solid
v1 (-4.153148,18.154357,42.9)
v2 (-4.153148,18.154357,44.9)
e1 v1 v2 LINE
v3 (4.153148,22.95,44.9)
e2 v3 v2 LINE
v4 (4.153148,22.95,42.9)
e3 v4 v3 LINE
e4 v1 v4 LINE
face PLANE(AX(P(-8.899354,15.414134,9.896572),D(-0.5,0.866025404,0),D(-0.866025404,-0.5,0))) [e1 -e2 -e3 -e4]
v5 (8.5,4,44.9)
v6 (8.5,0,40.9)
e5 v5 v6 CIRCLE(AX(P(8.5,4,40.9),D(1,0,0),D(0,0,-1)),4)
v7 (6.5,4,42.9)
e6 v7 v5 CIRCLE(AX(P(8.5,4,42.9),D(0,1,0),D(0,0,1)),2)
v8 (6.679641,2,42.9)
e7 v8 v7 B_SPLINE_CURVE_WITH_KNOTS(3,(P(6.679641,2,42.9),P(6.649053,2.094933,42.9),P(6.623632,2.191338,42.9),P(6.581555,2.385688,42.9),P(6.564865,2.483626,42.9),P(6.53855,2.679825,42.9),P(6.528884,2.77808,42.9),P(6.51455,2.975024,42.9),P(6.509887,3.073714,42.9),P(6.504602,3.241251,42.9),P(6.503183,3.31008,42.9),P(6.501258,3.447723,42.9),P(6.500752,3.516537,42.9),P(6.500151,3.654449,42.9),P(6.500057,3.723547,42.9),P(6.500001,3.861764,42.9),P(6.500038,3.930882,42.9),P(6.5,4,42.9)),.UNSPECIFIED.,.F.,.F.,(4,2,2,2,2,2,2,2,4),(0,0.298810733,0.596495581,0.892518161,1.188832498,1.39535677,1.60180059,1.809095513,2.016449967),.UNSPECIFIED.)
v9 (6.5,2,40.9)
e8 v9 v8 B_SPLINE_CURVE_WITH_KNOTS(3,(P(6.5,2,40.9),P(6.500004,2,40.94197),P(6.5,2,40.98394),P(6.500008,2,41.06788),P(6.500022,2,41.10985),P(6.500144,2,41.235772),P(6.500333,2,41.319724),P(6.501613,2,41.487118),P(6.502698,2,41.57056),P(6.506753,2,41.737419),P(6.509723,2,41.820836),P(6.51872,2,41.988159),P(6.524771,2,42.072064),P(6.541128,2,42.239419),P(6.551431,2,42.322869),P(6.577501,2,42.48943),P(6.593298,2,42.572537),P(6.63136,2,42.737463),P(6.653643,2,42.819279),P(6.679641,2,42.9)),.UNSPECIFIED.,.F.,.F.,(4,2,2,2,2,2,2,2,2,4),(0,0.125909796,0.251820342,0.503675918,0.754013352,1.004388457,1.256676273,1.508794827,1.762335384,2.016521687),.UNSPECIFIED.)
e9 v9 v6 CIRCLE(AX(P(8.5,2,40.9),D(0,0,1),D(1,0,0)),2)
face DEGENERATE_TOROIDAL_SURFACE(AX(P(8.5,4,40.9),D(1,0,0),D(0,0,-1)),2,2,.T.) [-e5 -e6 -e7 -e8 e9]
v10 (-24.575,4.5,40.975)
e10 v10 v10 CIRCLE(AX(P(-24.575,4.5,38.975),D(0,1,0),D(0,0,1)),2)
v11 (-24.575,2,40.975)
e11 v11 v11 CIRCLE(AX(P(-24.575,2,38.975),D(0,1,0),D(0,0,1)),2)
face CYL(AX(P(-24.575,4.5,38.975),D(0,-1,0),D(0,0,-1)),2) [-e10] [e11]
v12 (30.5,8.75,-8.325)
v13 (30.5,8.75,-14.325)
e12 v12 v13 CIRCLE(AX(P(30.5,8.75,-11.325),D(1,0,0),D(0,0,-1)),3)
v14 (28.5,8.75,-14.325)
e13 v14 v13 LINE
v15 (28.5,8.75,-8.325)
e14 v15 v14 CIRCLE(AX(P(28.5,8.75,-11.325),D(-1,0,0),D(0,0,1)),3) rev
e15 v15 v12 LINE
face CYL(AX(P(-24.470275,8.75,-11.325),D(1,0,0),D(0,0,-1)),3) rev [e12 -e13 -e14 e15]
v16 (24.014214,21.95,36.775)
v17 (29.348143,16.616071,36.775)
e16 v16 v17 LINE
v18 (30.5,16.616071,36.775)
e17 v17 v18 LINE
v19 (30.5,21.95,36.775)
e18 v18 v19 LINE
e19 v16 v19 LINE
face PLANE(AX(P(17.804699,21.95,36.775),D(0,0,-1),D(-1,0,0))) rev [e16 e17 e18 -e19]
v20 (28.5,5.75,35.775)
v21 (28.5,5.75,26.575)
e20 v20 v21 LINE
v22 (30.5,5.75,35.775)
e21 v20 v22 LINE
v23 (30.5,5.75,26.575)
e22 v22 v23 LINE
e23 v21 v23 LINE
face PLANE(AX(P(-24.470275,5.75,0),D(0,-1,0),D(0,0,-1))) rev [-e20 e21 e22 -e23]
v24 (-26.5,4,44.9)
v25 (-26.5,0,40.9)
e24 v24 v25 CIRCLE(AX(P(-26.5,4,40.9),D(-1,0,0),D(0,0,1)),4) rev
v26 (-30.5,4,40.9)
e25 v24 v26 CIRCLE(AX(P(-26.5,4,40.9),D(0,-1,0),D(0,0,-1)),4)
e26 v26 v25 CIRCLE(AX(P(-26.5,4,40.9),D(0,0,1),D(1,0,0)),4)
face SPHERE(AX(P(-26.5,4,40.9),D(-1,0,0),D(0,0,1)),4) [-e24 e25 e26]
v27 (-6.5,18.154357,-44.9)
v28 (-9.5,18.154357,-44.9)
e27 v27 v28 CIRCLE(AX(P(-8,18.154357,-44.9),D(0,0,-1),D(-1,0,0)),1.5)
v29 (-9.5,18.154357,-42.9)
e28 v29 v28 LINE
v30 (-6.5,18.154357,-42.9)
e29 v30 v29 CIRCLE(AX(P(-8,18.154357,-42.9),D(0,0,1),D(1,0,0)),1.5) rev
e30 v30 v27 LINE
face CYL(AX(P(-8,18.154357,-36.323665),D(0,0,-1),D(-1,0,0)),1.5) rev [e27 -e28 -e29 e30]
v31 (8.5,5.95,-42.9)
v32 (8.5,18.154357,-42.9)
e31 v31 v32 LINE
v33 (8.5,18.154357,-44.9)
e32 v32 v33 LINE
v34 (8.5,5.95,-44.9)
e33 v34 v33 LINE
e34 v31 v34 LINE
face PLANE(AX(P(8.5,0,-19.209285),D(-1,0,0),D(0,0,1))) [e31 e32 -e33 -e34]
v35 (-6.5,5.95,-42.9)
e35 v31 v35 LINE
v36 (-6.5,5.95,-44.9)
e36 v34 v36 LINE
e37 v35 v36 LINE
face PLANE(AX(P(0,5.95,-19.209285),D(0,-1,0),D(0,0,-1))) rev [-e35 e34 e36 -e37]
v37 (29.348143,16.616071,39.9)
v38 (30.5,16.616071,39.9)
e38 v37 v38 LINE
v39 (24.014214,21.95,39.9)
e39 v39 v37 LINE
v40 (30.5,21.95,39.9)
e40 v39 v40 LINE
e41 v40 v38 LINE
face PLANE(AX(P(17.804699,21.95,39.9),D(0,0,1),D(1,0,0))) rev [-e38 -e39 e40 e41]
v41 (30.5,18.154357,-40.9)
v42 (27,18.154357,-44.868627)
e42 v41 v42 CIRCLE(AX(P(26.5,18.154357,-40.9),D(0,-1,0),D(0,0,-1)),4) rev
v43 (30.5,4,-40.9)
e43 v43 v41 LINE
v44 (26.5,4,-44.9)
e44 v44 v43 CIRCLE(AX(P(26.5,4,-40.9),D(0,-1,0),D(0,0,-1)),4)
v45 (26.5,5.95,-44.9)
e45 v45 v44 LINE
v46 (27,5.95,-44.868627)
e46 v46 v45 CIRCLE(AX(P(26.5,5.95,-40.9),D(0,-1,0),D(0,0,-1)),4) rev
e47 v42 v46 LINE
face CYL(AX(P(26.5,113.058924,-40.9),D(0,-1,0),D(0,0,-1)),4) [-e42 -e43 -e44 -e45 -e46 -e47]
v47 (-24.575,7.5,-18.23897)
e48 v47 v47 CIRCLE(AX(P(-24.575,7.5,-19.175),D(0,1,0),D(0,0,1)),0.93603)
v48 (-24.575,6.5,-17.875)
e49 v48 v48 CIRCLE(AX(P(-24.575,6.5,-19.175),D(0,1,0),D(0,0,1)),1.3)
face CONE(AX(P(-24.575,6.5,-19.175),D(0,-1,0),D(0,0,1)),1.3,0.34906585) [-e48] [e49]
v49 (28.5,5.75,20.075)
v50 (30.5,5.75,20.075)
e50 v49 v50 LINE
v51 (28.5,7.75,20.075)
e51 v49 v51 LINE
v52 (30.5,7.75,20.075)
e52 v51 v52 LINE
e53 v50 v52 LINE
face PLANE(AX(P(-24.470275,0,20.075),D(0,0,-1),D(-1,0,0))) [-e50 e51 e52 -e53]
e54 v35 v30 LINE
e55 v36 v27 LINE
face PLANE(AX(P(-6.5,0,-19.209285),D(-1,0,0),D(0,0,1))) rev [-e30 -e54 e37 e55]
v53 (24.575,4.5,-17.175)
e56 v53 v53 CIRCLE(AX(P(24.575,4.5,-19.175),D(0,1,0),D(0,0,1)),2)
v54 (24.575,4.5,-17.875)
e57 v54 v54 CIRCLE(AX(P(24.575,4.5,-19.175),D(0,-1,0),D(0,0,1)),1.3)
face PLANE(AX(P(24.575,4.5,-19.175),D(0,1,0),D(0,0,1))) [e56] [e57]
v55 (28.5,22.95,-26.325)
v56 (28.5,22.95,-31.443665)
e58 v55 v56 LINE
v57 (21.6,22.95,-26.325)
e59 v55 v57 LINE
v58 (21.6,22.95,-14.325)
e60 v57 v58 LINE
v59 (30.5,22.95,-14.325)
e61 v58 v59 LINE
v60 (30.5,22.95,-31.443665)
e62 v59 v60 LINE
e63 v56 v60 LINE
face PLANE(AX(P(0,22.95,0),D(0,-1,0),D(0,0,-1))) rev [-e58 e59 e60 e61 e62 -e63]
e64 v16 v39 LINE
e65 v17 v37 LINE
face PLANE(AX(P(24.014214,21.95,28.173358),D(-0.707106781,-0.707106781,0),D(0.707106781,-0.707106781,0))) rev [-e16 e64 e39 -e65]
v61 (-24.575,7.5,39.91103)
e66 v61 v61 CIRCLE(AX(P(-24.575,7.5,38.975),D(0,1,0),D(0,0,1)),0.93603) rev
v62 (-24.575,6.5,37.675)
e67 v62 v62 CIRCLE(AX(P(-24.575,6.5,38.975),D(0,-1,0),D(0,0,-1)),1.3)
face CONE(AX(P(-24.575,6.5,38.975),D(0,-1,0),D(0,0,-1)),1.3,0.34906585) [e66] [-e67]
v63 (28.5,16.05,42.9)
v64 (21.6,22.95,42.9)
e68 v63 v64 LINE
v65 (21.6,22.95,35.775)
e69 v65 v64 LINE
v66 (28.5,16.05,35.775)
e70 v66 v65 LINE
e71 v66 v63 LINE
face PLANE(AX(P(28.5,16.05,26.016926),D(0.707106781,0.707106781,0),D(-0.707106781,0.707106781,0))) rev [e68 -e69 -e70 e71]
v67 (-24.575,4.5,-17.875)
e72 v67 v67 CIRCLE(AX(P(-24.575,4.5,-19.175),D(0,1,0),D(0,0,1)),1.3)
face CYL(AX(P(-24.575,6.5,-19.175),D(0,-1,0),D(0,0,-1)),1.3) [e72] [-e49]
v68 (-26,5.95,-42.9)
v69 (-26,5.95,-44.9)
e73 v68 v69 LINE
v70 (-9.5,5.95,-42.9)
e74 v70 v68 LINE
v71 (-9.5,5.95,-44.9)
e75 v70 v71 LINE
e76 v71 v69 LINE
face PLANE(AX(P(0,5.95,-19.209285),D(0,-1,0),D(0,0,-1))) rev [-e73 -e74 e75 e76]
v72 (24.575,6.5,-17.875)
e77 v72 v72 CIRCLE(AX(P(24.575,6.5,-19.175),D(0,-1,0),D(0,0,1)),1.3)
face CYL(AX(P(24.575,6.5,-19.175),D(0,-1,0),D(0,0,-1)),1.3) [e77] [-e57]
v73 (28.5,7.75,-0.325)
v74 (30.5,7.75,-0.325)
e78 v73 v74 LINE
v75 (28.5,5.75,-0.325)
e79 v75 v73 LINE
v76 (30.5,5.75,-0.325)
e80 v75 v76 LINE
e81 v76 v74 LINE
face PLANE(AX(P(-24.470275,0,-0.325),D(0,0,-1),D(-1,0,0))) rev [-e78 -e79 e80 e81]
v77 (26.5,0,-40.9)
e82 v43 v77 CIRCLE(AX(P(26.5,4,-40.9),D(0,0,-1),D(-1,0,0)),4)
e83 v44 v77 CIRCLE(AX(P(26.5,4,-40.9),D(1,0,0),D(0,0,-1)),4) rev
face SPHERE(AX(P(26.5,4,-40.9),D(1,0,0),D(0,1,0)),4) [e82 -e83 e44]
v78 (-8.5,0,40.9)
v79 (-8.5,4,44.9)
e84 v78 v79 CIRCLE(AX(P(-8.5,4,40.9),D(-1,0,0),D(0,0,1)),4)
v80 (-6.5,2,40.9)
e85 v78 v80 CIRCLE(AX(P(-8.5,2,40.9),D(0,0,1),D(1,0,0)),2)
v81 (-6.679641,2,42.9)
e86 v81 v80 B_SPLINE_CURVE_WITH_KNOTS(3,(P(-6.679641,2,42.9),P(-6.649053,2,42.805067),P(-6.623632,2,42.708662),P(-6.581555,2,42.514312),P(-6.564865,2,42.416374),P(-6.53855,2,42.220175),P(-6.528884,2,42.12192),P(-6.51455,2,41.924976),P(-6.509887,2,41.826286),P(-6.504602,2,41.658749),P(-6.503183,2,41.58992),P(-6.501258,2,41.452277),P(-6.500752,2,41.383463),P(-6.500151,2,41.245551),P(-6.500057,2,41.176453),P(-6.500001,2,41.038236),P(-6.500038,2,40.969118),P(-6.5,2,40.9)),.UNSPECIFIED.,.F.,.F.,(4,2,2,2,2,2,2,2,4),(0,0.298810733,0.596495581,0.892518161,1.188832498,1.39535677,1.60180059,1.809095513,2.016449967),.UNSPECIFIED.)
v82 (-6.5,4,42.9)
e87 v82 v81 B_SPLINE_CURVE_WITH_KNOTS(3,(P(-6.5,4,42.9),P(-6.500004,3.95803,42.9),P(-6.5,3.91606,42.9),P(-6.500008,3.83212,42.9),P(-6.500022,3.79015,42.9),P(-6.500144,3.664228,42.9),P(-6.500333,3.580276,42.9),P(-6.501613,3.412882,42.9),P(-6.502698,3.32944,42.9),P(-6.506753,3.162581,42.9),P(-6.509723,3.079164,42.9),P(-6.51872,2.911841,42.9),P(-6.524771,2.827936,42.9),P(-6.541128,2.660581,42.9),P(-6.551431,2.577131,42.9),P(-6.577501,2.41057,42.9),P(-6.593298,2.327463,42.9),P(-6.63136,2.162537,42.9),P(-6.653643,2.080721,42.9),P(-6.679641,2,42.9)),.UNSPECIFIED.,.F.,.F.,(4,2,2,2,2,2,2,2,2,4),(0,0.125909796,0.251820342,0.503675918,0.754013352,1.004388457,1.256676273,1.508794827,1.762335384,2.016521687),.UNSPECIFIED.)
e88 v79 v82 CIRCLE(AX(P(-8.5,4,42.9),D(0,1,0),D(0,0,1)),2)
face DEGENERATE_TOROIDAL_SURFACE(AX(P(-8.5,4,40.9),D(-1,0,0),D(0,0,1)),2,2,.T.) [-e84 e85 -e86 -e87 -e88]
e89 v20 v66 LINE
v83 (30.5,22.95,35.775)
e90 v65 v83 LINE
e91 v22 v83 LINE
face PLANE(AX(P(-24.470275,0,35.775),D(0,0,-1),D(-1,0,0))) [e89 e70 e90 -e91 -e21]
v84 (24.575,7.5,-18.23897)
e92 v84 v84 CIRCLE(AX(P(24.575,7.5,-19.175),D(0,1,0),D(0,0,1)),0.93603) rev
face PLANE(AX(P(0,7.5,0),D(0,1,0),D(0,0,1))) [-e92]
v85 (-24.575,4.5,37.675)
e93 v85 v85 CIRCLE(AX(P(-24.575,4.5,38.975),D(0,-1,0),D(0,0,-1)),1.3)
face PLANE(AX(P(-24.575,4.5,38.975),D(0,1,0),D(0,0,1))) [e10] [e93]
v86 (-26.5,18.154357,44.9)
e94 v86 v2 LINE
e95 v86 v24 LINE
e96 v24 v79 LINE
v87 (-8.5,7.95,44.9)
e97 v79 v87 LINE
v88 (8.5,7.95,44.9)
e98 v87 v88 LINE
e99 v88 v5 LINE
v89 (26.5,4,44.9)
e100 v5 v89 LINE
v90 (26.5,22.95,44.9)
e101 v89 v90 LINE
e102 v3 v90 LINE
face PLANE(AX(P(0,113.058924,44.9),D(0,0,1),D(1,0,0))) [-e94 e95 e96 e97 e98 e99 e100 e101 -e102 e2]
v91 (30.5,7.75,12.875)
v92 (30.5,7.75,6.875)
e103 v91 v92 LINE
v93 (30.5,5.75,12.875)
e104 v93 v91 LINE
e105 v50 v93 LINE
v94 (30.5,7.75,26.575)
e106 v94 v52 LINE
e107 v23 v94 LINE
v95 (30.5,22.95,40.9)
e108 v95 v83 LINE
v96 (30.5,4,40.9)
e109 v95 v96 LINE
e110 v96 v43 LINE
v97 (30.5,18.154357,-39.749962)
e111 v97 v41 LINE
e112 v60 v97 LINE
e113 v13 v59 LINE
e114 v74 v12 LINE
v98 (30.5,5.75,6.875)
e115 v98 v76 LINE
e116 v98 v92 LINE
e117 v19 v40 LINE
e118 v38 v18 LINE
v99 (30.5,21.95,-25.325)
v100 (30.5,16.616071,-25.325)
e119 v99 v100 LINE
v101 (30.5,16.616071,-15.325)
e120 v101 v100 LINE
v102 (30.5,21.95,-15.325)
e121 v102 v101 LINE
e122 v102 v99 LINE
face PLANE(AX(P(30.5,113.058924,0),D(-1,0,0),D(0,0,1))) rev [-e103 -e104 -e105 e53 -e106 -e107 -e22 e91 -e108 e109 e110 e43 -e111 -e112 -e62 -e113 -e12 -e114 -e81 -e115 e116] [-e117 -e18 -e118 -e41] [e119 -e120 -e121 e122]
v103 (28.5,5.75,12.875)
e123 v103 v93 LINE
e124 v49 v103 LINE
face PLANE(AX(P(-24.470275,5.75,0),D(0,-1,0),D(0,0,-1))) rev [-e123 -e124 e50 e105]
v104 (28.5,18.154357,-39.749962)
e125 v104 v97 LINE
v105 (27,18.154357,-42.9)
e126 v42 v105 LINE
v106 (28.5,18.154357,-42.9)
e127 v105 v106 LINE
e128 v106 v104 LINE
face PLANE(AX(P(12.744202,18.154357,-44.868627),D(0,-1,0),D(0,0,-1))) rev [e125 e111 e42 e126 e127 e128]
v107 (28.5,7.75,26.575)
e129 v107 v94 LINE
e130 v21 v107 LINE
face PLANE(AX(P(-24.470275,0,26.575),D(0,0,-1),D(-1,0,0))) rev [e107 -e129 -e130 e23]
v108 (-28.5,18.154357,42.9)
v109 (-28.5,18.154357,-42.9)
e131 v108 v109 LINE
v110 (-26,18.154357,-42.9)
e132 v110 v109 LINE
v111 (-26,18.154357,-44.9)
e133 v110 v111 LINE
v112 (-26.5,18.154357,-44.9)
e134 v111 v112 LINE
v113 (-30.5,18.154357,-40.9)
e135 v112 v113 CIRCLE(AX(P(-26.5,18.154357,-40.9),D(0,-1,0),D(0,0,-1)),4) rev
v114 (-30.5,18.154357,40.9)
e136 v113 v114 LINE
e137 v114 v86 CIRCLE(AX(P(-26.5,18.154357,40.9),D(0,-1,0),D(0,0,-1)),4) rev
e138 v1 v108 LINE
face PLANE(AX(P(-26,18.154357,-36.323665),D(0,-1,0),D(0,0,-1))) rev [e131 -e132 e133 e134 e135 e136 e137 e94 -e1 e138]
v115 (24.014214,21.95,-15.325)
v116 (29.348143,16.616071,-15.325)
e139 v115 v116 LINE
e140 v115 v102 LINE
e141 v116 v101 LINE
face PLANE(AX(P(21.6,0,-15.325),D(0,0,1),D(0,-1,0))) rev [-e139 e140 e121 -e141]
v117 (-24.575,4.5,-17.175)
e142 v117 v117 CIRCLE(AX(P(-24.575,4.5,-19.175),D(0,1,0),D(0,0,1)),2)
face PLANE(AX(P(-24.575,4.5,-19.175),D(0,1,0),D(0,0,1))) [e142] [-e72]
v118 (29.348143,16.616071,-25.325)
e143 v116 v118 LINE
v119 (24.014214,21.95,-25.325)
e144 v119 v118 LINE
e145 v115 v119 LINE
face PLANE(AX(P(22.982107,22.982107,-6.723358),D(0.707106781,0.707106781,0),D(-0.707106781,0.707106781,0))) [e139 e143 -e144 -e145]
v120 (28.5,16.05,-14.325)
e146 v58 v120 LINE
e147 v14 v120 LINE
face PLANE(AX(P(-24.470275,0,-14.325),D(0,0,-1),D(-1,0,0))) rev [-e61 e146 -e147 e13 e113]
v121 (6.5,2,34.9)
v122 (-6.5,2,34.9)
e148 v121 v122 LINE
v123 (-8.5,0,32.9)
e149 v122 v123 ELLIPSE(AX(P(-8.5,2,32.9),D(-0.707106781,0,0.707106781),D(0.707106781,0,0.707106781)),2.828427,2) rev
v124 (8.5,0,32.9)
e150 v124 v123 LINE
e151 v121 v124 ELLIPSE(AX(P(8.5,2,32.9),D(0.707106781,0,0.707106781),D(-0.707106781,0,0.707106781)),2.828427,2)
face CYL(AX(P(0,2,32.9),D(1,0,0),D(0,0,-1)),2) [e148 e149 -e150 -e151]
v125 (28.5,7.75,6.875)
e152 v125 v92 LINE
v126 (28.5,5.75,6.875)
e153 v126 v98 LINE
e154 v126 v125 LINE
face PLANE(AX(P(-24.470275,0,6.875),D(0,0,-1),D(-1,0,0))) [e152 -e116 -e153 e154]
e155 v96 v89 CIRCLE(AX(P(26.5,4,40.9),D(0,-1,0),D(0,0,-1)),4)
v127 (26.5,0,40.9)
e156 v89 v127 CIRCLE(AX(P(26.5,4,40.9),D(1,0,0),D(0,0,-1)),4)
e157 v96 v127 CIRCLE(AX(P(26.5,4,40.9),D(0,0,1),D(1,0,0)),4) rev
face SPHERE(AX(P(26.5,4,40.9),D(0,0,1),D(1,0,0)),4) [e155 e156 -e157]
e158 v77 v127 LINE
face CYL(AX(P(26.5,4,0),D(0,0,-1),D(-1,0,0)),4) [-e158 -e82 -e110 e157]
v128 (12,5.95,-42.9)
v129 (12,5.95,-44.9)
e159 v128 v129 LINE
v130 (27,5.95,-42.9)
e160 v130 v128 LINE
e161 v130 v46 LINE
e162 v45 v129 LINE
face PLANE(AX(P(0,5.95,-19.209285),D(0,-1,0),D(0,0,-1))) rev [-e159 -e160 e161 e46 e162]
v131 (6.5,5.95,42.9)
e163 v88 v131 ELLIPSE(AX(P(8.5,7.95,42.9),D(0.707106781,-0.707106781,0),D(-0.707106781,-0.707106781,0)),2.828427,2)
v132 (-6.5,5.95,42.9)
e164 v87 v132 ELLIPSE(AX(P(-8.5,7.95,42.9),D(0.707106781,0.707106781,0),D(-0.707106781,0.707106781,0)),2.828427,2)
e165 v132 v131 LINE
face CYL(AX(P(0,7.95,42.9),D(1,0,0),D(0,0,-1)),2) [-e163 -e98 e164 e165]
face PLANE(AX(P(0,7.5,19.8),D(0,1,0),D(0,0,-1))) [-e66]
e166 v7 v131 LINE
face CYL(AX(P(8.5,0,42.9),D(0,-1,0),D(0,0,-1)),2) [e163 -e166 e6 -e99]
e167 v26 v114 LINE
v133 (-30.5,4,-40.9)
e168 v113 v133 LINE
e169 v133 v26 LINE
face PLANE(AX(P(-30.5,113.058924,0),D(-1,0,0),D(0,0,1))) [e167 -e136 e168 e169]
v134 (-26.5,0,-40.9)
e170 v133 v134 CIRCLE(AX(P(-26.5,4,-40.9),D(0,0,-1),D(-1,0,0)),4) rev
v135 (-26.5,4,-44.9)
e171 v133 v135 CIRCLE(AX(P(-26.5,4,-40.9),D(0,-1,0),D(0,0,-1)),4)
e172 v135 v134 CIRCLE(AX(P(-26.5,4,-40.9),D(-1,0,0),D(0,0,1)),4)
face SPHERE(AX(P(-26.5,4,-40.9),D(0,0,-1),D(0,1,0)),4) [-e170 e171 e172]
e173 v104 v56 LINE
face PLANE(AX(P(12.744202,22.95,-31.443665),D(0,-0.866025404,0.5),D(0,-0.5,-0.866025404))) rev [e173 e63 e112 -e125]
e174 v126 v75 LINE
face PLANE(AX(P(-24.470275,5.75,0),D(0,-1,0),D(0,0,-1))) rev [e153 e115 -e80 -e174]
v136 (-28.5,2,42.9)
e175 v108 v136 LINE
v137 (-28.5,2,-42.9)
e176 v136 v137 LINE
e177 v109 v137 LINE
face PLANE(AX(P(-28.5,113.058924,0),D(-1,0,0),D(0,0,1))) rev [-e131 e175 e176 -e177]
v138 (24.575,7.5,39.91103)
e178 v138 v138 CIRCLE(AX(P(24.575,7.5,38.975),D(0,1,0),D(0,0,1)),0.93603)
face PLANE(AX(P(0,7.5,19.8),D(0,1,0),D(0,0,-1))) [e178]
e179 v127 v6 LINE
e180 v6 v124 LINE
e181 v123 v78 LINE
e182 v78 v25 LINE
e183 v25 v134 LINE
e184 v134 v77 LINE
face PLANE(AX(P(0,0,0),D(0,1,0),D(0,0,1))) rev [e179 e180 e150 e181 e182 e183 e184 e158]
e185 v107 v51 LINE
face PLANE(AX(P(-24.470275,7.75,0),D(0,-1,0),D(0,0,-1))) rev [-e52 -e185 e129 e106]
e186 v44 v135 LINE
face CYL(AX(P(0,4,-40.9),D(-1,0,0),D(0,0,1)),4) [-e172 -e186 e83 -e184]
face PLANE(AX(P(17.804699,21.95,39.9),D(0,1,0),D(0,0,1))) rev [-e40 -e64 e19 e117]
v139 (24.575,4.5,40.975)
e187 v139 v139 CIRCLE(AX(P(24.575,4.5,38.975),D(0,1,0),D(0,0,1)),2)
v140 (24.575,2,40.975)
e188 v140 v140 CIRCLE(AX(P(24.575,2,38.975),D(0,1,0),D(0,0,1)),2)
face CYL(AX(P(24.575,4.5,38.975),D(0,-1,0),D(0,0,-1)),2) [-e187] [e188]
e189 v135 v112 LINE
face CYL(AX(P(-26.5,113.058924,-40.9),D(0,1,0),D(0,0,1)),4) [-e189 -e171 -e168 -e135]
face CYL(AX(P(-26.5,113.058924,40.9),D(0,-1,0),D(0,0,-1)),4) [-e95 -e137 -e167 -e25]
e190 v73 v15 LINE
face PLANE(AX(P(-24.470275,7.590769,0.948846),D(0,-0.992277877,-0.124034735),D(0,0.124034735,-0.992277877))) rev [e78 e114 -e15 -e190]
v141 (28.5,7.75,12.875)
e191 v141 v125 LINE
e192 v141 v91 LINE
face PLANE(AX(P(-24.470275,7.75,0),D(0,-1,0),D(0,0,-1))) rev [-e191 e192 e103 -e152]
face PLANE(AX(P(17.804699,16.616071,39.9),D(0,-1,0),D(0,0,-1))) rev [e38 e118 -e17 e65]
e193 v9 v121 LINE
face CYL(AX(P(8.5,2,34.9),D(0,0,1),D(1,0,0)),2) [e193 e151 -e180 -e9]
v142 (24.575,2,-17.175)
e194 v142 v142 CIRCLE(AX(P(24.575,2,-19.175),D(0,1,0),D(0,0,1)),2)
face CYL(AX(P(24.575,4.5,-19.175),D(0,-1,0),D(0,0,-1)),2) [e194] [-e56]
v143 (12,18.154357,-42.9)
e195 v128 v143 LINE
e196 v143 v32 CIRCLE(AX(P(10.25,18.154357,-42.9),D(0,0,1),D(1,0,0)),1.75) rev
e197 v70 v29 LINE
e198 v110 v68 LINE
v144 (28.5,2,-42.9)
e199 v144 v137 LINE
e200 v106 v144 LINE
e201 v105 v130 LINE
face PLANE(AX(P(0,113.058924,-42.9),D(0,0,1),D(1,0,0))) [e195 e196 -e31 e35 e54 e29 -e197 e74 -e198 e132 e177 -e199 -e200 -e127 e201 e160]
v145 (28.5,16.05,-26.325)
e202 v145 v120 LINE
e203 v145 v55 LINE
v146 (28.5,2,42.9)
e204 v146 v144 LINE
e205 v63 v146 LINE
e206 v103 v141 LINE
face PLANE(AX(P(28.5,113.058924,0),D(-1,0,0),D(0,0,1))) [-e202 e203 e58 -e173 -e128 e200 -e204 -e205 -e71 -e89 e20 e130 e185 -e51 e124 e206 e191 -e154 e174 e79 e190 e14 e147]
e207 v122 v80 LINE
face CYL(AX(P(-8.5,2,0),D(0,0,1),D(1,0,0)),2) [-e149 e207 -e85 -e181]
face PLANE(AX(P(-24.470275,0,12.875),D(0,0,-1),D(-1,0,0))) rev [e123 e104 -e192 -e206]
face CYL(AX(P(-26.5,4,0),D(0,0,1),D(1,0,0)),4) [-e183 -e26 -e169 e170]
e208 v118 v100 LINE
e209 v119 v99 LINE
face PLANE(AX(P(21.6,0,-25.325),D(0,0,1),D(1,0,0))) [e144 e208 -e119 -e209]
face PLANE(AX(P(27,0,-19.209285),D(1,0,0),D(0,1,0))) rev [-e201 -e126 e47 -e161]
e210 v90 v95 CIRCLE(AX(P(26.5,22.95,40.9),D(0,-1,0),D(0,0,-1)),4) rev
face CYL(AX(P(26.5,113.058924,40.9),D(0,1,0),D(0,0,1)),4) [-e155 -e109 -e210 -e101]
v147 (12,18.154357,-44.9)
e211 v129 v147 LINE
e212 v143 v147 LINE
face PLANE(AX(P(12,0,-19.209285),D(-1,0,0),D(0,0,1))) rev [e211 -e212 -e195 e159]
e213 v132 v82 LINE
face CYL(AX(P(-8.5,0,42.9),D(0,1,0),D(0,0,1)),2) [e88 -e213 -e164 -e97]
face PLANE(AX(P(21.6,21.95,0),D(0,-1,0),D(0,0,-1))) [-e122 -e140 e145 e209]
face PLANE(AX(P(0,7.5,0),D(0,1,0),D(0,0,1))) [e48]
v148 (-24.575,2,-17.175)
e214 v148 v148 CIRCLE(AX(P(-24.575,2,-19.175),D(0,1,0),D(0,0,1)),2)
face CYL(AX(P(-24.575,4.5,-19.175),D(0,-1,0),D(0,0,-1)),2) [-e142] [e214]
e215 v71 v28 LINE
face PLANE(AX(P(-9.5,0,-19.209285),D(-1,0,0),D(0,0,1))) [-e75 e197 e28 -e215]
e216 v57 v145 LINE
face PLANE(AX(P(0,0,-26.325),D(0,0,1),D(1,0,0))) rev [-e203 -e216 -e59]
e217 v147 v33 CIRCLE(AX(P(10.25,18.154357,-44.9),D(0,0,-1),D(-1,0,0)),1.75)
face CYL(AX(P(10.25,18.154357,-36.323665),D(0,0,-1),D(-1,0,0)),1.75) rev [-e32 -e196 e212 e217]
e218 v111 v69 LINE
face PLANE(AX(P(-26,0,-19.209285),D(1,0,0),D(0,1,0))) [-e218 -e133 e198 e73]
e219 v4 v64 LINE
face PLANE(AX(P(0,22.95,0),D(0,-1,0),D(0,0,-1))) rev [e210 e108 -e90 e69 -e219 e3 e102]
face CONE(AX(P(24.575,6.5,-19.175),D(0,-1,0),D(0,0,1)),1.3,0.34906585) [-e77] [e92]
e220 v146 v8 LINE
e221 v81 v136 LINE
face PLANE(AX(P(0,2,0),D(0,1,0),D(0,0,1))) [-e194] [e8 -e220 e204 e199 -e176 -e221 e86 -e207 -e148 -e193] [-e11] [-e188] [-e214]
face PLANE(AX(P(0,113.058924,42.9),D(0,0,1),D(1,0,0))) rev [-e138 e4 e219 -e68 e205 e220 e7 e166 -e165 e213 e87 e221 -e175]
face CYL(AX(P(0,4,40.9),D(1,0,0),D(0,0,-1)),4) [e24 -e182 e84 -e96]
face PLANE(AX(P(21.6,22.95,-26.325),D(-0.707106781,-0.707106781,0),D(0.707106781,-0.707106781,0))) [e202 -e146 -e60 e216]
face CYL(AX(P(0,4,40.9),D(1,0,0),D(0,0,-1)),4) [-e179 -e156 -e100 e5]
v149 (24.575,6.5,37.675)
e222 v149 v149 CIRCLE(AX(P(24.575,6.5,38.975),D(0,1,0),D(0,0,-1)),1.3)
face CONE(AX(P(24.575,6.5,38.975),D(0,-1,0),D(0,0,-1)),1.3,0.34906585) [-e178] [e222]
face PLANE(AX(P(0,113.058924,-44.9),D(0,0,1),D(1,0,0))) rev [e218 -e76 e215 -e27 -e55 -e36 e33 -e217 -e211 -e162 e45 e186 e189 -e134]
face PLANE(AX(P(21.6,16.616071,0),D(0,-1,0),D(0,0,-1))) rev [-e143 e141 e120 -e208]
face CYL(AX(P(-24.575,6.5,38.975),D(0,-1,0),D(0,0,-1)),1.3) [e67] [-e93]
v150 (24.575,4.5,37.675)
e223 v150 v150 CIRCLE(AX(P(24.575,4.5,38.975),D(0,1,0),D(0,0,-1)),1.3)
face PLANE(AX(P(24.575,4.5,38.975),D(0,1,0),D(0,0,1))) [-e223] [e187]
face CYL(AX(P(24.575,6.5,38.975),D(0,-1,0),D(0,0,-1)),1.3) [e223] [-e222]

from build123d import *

# Parameters (mm, degrees)
SZKIC1_W                     = 56.2
SZKIC1_H                     = 85
DODANIE_WYCI_GNI_CIE2_DEPTH  = 2
SZKIC2_R                     = 2
DODANIE_WYCI_GNI_CIE5_DEPTH  = 2.5
SZKIC4_R                     = 1.3
DODANIE_WYCI_GNI_CIE6_DEPTH  = 2
SZKIC6_R                     = 1.3
DODANIE_WYCI_GNI_CIE7_DEPTH  = 1
DODANIE_WYCI_GNI_CIE7_TAPER  = 20
SZKIC1_4_W                   = 57
SZKIC1_4_H                   = 85.8
SZKIC1_4_W_2                 = 56.2
SZKIC1_4_H_2                 = 85
DODANIE_WYCI_GNI_CIE3_DEPTH  = 2
SZKIC1_5_W                   = 61
SZKIC1_5_H                   = 89.8
SZKIC1_5_W_2                 = 57
SZKIC1_5_H_2                 = 85.8
DODANIE_WYCI_GNI_CIE4_DEPTH  = 4.5
LUSTRO2_COPY_1_SKETCH_R      = 1.3
LUSTRO2_COPY_1_DEPTH         = 2
LUSTRO2_COPY_2_SKETCH_R      = 1.3
LUSTRO2_COPY_2_DEPTH         = 1
LUSTRO2_COPY_2_TAPER         = 20
SZKIC12_W                    = 13
SZKIC12_H                    = 4.5
WYTNIJ_WYCI_GNI_CIE4_DEPTH   = 10
DODANIE_WYCI_GNI_CIE8_DEPTH  = 1.45
SZKIC14_W                    = 61
SZKIC14_H                    = 89.8
SZKIC14_W_2                  = 57
SZKIC14_H_2                  = 85.8
DODANIE_WYCI_GNI_CIE9_DEPTH  = 17
SZKIC15_W                    = 16.5
SZKIC15_H                    = 17
SZKIC15_W_2                  = 15
WYTNIJ_WYCI_GNI_CIE5_DEPTH   = 2
SZKIC16_W                    = 9.2
SZKIC16_H                    = 11.2
SZKIC16_H_2                  = 2
SZKIC16_W_2                  = 7.2
SZKIC16_W_3                  = 8
SZKIC16_W_4                  = 6
SZKIC16_W_5                  = 6.5
WYTNIJ_WYCI_GNI_CIE6_DEPTH   = 2
ZAOKR_GLENIE1_R              = 4
ZAOKR_GLENIE2_R              = 2
DODANIE_WYCI_GNI_CIE10_DEPTH = 12
WYTNIJ_WYCI_GNI_CIE8_REACH   = 81.144
SZKIC19_W                    = 10
SZKIC19_H                    = 5.333929422
DODANIE_WYCI_GNI_CIE11_DEPTH = 10
SZKIC22_W                    = 4.5
SZKIC22_H                    = 4.795642615
WYTNIJ_WYCI_GNI_CIE10_DEPTH  = 2
SZKIC23_W                    = 87.8
SZKIC23_H                    = 4.795642615
WYTNIJ_WYCI_GNI_CIE11_DEPTH  = 2
SZKIC28_W                    = 2
SZKIC28_H                    = 4.795642615
WYTNIJ_WYCI_GNI_CIE17_DEPTH  = 2
DODANIE_WYCI_GNI_CIE12_DEPTH = 7.125
WYTNIJ_WYCI_GNI_CIE18_REACH  = 81.144
SZKIC30_W                    = 3.125
SZKIC30_H                    = 5.333929422
DODANIE_WYCI_GNI_CIE13_DEPTH = 3.125
WYTNIJ_WYCI_GNI_CIE19_DEPTH  = 3.5


with BuildPart() as part:
    # Szkic1 → Dodanie-wyciągnięcie2 (new body)
    with BuildSketch(Plane(origin=(0, 0, 0), x_dir=(1, 0, 0), z_dir=(0, 1, 0))):
        Rectangle(SZKIC1_W, SZKIC1_H)
    extrude(amount=DODANIE_WYCI_GNI_CIE2_DEPTH)

    # Szkic2 → Dodanie-wyciągnięcie5 (add)
    with BuildSketch(Plane(origin=(0, 2, 0), x_dir=(1, 0, 0), z_dir=(0, 1, 0))):
        with Locations(Location((-24.575, -38.975, 0), (0, 0, 270))):
            Circle(SZKIC2_R)
        with Locations(Location((24.575, -38.975, 0), (0, 0, 270))):
            Circle(SZKIC2_R)
        with Locations(Location((-24.575, 19.175, 0), (0, 0, 270))):
            Circle(SZKIC2_R)
        with Locations(Location((24.575, 19.175, 0), (0, 0, 270))):
            Circle(SZKIC2_R)
    extrude(amount=DODANIE_WYCI_GNI_CIE5_DEPTH)

    # Szkic4 → Dodanie-wyciągnięcie6 (add)
    with BuildSketch(Plane(origin=(0, 4.5, 0), x_dir=(1, 0, 0), z_dir=(0, 1, 0))):
        with Locations(Location((-24.575, 19.175, 0), (0, 0, 270))):
            Circle(SZKIC4_R)
    dodanie_wyci_gni_cie6 = extrude(amount=DODANIE_WYCI_GNI_CIE6_DEPTH)

    # Szkic6 → Dodanie-wyciągnięcie7 (add)
    with BuildSketch(Plane(origin=(0, 6.5, 0), x_dir=(1, 0, 0), z_dir=(0, 1, 0))):
        with Locations(Location((-24.575, 19.175, 0), (0, 0, 270))):
            Circle(SZKIC6_R)
    dodanie_wyci_gni_cie7 = extrude(amount=DODANIE_WYCI_GNI_CIE7_DEPTH, taper=DODANIE_WYCI_GNI_CIE7_TAPER)

    # Szkic1<4> → Dodanie-wyciągnięcie3 (add)
    with BuildSketch(Plane(origin=(0, 0, 0), x_dir=(1, 0, 0), z_dir=(0, 1, 0))):
        Rectangle(SZKIC1_4_W, SZKIC1_4_H)
        Rectangle(SZKIC1_4_W_2, SZKIC1_4_H_2, mode=Mode.SUBTRACT)
    extrude(amount=DODANIE_WYCI_GNI_CIE3_DEPTH)

    # Szkic1<5> → Dodanie-wyciągnięcie4 (add)
    with BuildSketch(Plane(origin=(0, 0, 0), x_dir=(1, 0, 0), z_dir=(0, 1, 0))):
        Rectangle(SZKIC1_5_W, SZKIC1_5_H)
        Rectangle(SZKIC1_5_W_2, SZKIC1_5_H_2, mode=Mode.SUBTRACT)
    extrude(amount=DODANIE_WYCI_GNI_CIE4_DEPTH)

    # Lustro1: Dodanie-wyciągnięcie6, Dodanie-wyciągnięcie7 across plane
    add(dodanie_wyci_gni_cie6.mirror(Plane(origin=(0, 0, 0), x_dir=(0, 0, 1), z_dir=(1, 0, 0))))
    add(dodanie_wyci_gni_cie7.mirror(Plane(origin=(0, 0, 0), x_dir=(0, 0, 1), z_dir=(1, 0, 0))))

    # Lustro2: Dodanie-wyciągnięcie6, Dodanie-wyciągnięcie7 across plane
    add(dodanie_wyci_gni_cie6.mirror(Plane.XY.offset(9.9)))
    add(dodanie_wyci_gni_cie7.mirror(Plane.XY.offset(9.9)))

    # Lustro2 copy 1 sketch → Lustro2 copy 1 (add)
    with BuildSketch(Plane(origin=(0, 4.5, 19.8), x_dir=(-1, 0, 0), z_dir=(0, 1, 0))):
        with Locations(Location((-24.575, 19.175, 0), (0, 0, 270))):
            Circle(LUSTRO2_COPY_1_SKETCH_R)
    extrude(amount=LUSTRO2_COPY_1_DEPTH)

    # Lustro2 copy 2 sketch → Lustro2 copy 2 (add)
    with BuildSketch(Plane(origin=(0, 6.5, 19.8), x_dir=(-1, 0, 0), z_dir=(0, 1, 0))):
        with Locations(Location((-24.575, 19.175, 0), (0, 0, 270))):
            Circle(LUSTRO2_COPY_2_SKETCH_R)
    extrude(amount=LUSTRO2_COPY_2_DEPTH, taper=LUSTRO2_COPY_2_TAPER)

    # Szkic12 → Wytnij-wyciągnięcie4 (cut)
    with BuildSketch(Plane.XY.offset(44.9)):
        with Locations((0, 2.25)):
            Rectangle(SZKIC12_W, SZKIC12_H)
    extrude(amount=-WYTNIJ_WYCI_GNI_CIE4_DEPTH, mode=Mode.SUBTRACT)

    # Szkic13 → Dodanie-wyciągnięcie8 (add)
    with BuildSketch(Plane(origin=(0, 4.5, 0), x_dir=(1, 0, 0), z_dir=(0, 1, 0))):
        Polygon((-6.5, -44.9), (-6.5, -42.9), (-28.5, -42.9), (-28.5, 42.9), (28.5, 42.9), (28.5, -42.9), (6.5, -42.9), (6.5, -44.9), (30.5, -44.9), (30.5, 44.9), (-30.5, 44.9), (-30.5, -44.9), align=None)
    extrude(amount=DODANIE_WYCI_GNI_CIE8_DEPTH)

    # Szkic14 → Dodanie-wyciągnięcie9 (add)
    with BuildSketch(Plane(origin=(0, 5.95, 0), x_dir=(1, 0, 0), z_dir=(0, 1, 0))):
        Rectangle(SZKIC14_W, SZKIC14_H)
        Rectangle(SZKIC14_W_2, SZKIC14_H_2, mode=Mode.SUBTRACT)
    extrude(amount=DODANIE_WYCI_GNI_CIE9_DEPTH)

    # Szkic15 → Wytnij-wyciągnięcie5 (cut)
    with BuildSketch(Plane(origin=(0, 0, -44.9), x_dir=(-1, 0, 0), z_dir=(0, 0, -1))):
        with Locations((17.75, 14.45)):
            Rectangle(SZKIC15_W, SZKIC15_H)
        with Locations((-1, 14.45)):
            Rectangle(SZKIC15_W_2, SZKIC15_H)
        with Locations((-19.5, 14.45)):
            Rectangle(SZKIC15_W_2, SZKIC15_H)
    extrude(amount=-WYTNIJ_WYCI_GNI_CIE5_DEPTH, mode=Mode.SUBTRACT)

    # Szkic16 → Wytnij-wyciągnięcie6 (cut)
    with BuildSketch(Plane(origin=(30.5, 0, 0), x_dir=(0, 0, -1), z_dir=(1, 0, 0))):
        with Locations((-31.175, 17.35)):
            Rectangle(SZKIC16_W, SZKIC16_H)
        with Locations((-31.175, 10.75)):
            Rectangle(SZKIC16_W, SZKIC16_H_2)
        with Locations((-31.175, 8.75)):
            Rectangle(SZKIC16_W, SZKIC16_H_2)
        with Locations((-31.175, 6.75)):
            Rectangle(SZKIC16_W, SZKIC16_H_2)
        with Locations((-16.475, 17.35)):
            Rectangle(SZKIC16_W_2, SZKIC16_H)
        with Locations((-16.475, 10.75)):
            Rectangle(SZKIC16_W_2, SZKIC16_H_2)
        with Locations((-16.475, 8.75)):
            Rectangle(SZKIC16_W_2, SZKIC16_H_2)
        with Locations((-16.475, 6.75)):
            Rectangle(SZKIC16_W_2, SZKIC16_H_2)
        with Locations((-3.275, 17.35)):
            Rectangle(SZKIC16_W_2, SZKIC16_H)
        with Locations((-3.275, 10.75)):
            Rectangle(SZKIC16_W_2, SZKIC16_H_2)
        with Locations((-3.275, 8.75)):
            Rectangle(SZKIC16_W_2, SZKIC16_H_2)
        with Locations((-3.275, 6.75)):
            Rectangle(SZKIC16_W_2, SZKIC16_H_2)
        with Locations((4.325, 17.35)):
            Rectangle(SZKIC16_W_3, SZKIC16_H)
        with Locations((4.325, 10.75)):
            Rectangle(SZKIC16_W_3, SZKIC16_H_2)
        Polygon((8.325, 9.75), (0.325, 9.75), (0.325, 7.75), (8.325, 8.75), align=None)
        with Locations((-9.875, 17.35)):
            Rectangle(SZKIC16_W_4, SZKIC16_H)
        with Locations((-9.875, 10.75)):
            Rectangle(SZKIC16_W_4, SZKIC16_H_2)
        with Locations((-9.875, 8.75)):
            Rectangle(SZKIC16_W_4, SZKIC16_H_2)
        with Locations((-23.325, 17.35)):
            Rectangle(SZKIC16_W_5, SZKIC16_H)
        with Locations((-23.325, 10.75)):
            Rectangle(SZKIC16_W_5, SZKIC16_H_2)
        with Locations((-23.325, 8.75)):
            Rectangle(SZKIC16_W_5, SZKIC16_H_2)
        with BuildLine():
            ThreePointArc((8.496572875, 9.75), (8.368204321, 9.257305936), (8.325, 8.75))
            ThreePointArc((8.325, 8.75), (8.368204321, 8.242694064), (8.496572875, 7.75))
            Line((8.496572875, 7.75), (14.153427125, 7.75))
            ThreePointArc((14.153427125, 7.75), (14.281795679, 8.242694064), (14.325, 8.75))
            ThreePointArc((14.325, 8.75), (14.281795679, 9.257305936), (14.153427125, 9.75))
            Line((14.153427125, 9.75), (8.496572875, 9.75))
        make_face()
        with BuildLine():
            ThreePointArc((14.153427125, 9.75), (13.057050808, 11.199489743), (11.325, 11.75))
            ThreePointArc((11.325, 11.75), (9.592949192, 11.199489743), (8.496572875, 9.75))
            Line((8.496572875, 9.75), (14.153427125, 9.75))
        make_face()
        with BuildLine():
            Line((14.153427125, 7.75), (8.496572875, 7.75))
            ThreePointArc((8.496572875, 7.75), (9.592949174, 6.30051027), (11.324999954, 5.75))
            ThreePointArc((11.324999954, 5.75), (13.057050789, 6.300510244), (14.153427125, 7.75))
        make_face()
        with BuildLine():
            Line((11.325, 11.75), (8.325, 11.75))
            Line((8.325, 11.75), (8.325, 9.75))
            Line((8.325, 9.75), (8.496572875, 9.75))
            ThreePointArc((8.496572875, 9.75), (9.592949192, 11.199489743), (11.325, 11.75))
        make_face()
        with BuildLine():
            Line((14.325, 9.75), (14.325, 11.75))
            Line((14.325, 11.75), (11.325, 11.75))
            ThreePointArc((11.325, 11.75), (13.057050808, 11.199489743), (14.153427125, 9.75))
            Line((14.153427125, 9.75), (14.325, 9.75))
        make_face()
        Polygon((14.325, 22.95), (8.325, 22.95), (8.325, 11.75), (11.325, 11.75), (14.325, 11.75), align=None)
        with BuildLine():
            Line((14.325, 8.75), (14.325, 9.75))
            Line((14.325, 9.75), (14.153427125, 9.75))
            ThreePointArc((14.153427125, 9.75), (14.281795679, 9.257305936), (14.325, 8.75))
        make_face()
        with BuildLine():
            Line((8.496572875, 9.75), (8.325, 9.75))
            Line((8.325, 9.75), (8.325, 8.75))
            ThreePointArc((8.325, 8.75), (8.368204321, 9.257305936), (8.496572875, 9.75))
        make_face()
    extrude(amount=-WYTNIJ_WYCI_GNI_CIE6_DEPTH, mode=Mode.SUBTRACT)

    # Zaokrąglenie1
    zaokr_glenie1_edges = [part.edges().sort_by_distance(p)[0] for p in [
        (-18.5, 0, 44.9),
        (18.5, 0, 44.9),
        (30.5, 0, 0),
        (-30.5, 0, 0),
        (0, 0, -44.9),
        (-30.5, 11.475, -44.9),
        (30.5, 11.475, -44.9),
        (30.5, 11.475, 44.9),
        (-30.5, 11.475, 44.9),
    ]]
    fillet(zaokr_glenie1_edges, radius=ZAOKR_GLENIE1_R)

    # Zaokrąglenie2
    # the kernel refuses this fillet: 2 mm, written as the material it takes off along each edge
    with BuildSketch(Plane(origin=(6.5, 5.95, 44.9), x_dir=(0, 0, -1), z_dir=(0, -1, 0))) as zaokr_glenie2_piece_1:
        with BuildLine():
            CenterArc((ZAOKR_GLENIE2_R, ZAOKR_GLENIE2_R), ZAOKR_GLENIE2_R, 180, 90)
            Line((0, ZAOKR_GLENIE2_R), (0, 0))
            Line((0, 0), (ZAOKR_GLENIE2_R, 0))
        make_face()
    extrude(amount=1.95, mode=Mode.SUBTRACT)
    with BuildSketch(Plane(origin=(-6.5, 5.95, 44.9), x_dir=(0, 0, -1), z_dir=(0, -1, 0))) as zaokr_glenie2_piece_2:
        with BuildLine():
            CenterArc((ZAOKR_GLENIE2_R, -ZAOKR_GLENIE2_R), ZAOKR_GLENIE2_R, 90, 90)
            Line((0, -ZAOKR_GLENIE2_R), (0, 0))
            Line((0, 0), (ZAOKR_GLENIE2_R, 0))
        make_face()
    extrude(amount=1.95, mode=Mode.SUBTRACT)
    with BuildSketch(Plane(origin=(-6.5, 0, 40.9), x_dir=(-1, 0, 0), z_dir=(0, 0, -1))) as zaokr_glenie2_piece_3:
        with BuildLine():
            CenterArc((ZAOKR_GLENIE2_R, ZAOKR_GLENIE2_R), ZAOKR_GLENIE2_R, 180, 90)
            Line((0, ZAOKR_GLENIE2_R), (0, 0))
            Line((0, 0), (ZAOKR_GLENIE2_R, 0))
        make_face()
    extrude(amount=6, mode=Mode.SUBTRACT)
    with BuildSketch(Plane(origin=(-6.5, 5.95, 44.9), x_dir=(0, 1, 0), z_dir=(1, 0, 0))) as zaokr_glenie2_piece_4:
        with BuildLine():
            CenterArc((ZAOKR_GLENIE2_R, -ZAOKR_GLENIE2_R), ZAOKR_GLENIE2_R, 90, 90)
            Line((0, -ZAOKR_GLENIE2_R), (0, 0))
            Line((0, 0), (ZAOKR_GLENIE2_R, 0))
        make_face()
    extrude(amount=13, mode=Mode.SUBTRACT)
    with BuildSketch(Plane(origin=(6.5, 0, 40.9), x_dir=(1, 0, 0), z_dir=(0, 0, -1))) as zaokr_glenie2_piece_5:
        with BuildLine():
            CenterArc((ZAOKR_GLENIE2_R, -ZAOKR_GLENIE2_R), ZAOKR_GLENIE2_R, 90, 90)
            Line((0, -ZAOKR_GLENIE2_R), (0, 0))
            Line((0, 0), (ZAOKR_GLENIE2_R, 0))
        make_face()
    extrude(amount=6, mode=Mode.SUBTRACT)
    with BuildSketch(Plane(origin=(6.5, 4, 40.9), x_dir=(0, -1, 0), z_dir=(0, 0, -1))) as zaokr_glenie2_piece_6:
        with BuildLine():
            CenterArc((4 - ZAOKR_GLENIE2_R, -ZAOKR_GLENIE2_R), ZAOKR_GLENIE2_R, 0, 90)
            Line((4, -ZAOKR_GLENIE2_R), (4, 0))
            Line((4, 0), (4 - ZAOKR_GLENIE2_R, 0))
        make_face()
    revolve(axis=Axis((6.5, 4, 40.9), (-1, 0, 0)), revolution_arc=90, mode=Mode.SUBTRACT)
    with BuildSketch(Plane(origin=(-6.5, 4, 40.9), x_dir=(0, -1, 0), z_dir=(0, 0, -1))) as zaokr_glenie2_piece_7:
        with BuildLine():
            CenterArc((4 - ZAOKR_GLENIE2_R, ZAOKR_GLENIE2_R), ZAOKR_GLENIE2_R, 270, 90)
            Line((4, ZAOKR_GLENIE2_R), (4, 0))
            Line((4, 0), (4 - ZAOKR_GLENIE2_R, 0))
        make_face()
    revolve(axis=Axis((-6.5, 4, 40.9), (-1, 0, 0)), revolution_arc=90, mode=Mode.SUBTRACT)
    with BuildSketch(Plane(origin=(-6.5, 0, 34.9), x_dir=(0, 0, -1), z_dir=(1, 0, 0))) as zaokr_glenie2_piece_8:
        with BuildLine():
            CenterArc((ZAOKR_GLENIE2_R, ZAOKR_GLENIE2_R), ZAOKR_GLENIE2_R, 180, 90)
            Line((0, ZAOKR_GLENIE2_R), (0, 0))
            Line((0, 0), (ZAOKR_GLENIE2_R, 0))
        make_face()
    extrude(amount=13, mode=Mode.SUBTRACT)
    with BuildSketch(Plane(origin=(6.5, 10.95, 44.9), x_dir=(0, 0, -1), z_dir=(0, -1, 0))) as zaokr_glenie2_piece_9a_section:
        with BuildLine():
            CenterArc((ZAOKR_GLENIE2_R, ZAOKR_GLENIE2_R), ZAOKR_GLENIE2_R, 180, 90)
            Line((0, ZAOKR_GLENIE2_R), (0, 0))
            Line((0, 0), (ZAOKR_GLENIE2_R, 0))
        make_face()
    zaokr_glenie2_piece_9a = extrude(amount=6.95, mode=Mode.PRIVATE)
    zaokr_glenie2_piece_9a = split(zaokr_glenie2_piece_9a, bisect_by=Plane(origin=(6.952790229, 5.95, 44.447209771), z_dir=(0, 1, 0)), keep=Keep.TOP, mode=Mode.PRIVATE)
    with BuildSketch(Plane(origin=(-6.5, 5.95, 44.9), x_dir=(0, 1, 0), z_dir=(1, 0, 0))) as zaokr_glenie2_piece_9b_section:
        with BuildLine():
            CenterArc((ZAOKR_GLENIE2_R, -ZAOKR_GLENIE2_R), ZAOKR_GLENIE2_R, 90, 90)
            Line((0, -ZAOKR_GLENIE2_R), (0, 0))
            Line((0, 0), (ZAOKR_GLENIE2_R, 0))
        make_face()
    zaokr_glenie2_piece_9b = extrude(amount=18, mode=Mode.PRIVATE)
    zaokr_glenie2_piece_9b = split(zaokr_glenie2_piece_9b, bisect_by=Plane(origin=(6.5, 6.402790229, 44.447209771), z_dir=(1, 0, 0)), keep=Keep.TOP, mode=Mode.PRIVATE)
    zaokr_glenie2_piece_9 = zaokr_glenie2_piece_9a & zaokr_glenie2_piece_9b
    add(zaokr_glenie2_piece_9, mode=Mode.SUBTRACT)
    with BuildSketch(Plane(origin=(-6.5, 10.95, 44.9), x_dir=(0, 0, -1), z_dir=(0, -1, 0))) as zaokr_glenie2_piece_10a_section:
        with BuildLine():
            CenterArc((ZAOKR_GLENIE2_R, -ZAOKR_GLENIE2_R), ZAOKR_GLENIE2_R, 90, 90)
            Line((0, -ZAOKR_GLENIE2_R), (0, 0))
            Line((0, 0), (ZAOKR_GLENIE2_R, 0))
        make_face()
    zaokr_glenie2_piece_10a = extrude(amount=6.95, mode=Mode.PRIVATE)
    zaokr_glenie2_piece_10a = split(zaokr_glenie2_piece_10a, bisect_by=Plane(origin=(-6.952790229, 5.95, 44.447209771), z_dir=(0, 1, 0)), keep=Keep.TOP, mode=Mode.PRIVATE)
    with BuildSketch(Plane(origin=(-11.5, 5.95, 44.9), x_dir=(0, 1, 0), z_dir=(1, 0, 0))) as zaokr_glenie2_piece_10b_section:
        with BuildLine():
            CenterArc((ZAOKR_GLENIE2_R, -ZAOKR_GLENIE2_R), ZAOKR_GLENIE2_R, 90, 90)
            Line((0, -ZAOKR_GLENIE2_R), (0, 0))
            Line((0, 0), (ZAOKR_GLENIE2_R, 0))
        make_face()
    zaokr_glenie2_piece_10b = extrude(amount=18, mode=Mode.PRIVATE)
    zaokr_glenie2_piece_10b = split(zaokr_glenie2_piece_10b, bisect_by=Plane(origin=(-6.5, 6.402790229, 44.447209771), z_dir=(-1, 0, 0)), keep=Keep.TOP, mode=Mode.PRIVATE)
    zaokr_glenie2_piece_10 = zaokr_glenie2_piece_10a & zaokr_glenie2_piece_10b
    add(zaokr_glenie2_piece_10, mode=Mode.SUBTRACT)
    with BuildSketch(Plane(origin=(-11.5, 0, 34.9), x_dir=(0, 0, -1), z_dir=(1, 0, 0))) as zaokr_glenie2_piece_11a_section:
        with BuildLine():
            CenterArc((ZAOKR_GLENIE2_R, ZAOKR_GLENIE2_R), ZAOKR_GLENIE2_R, 180, 90)
            Line((0, ZAOKR_GLENIE2_R), (0, 0))
            Line((0, 0), (ZAOKR_GLENIE2_R, 0))
        make_face()
    zaokr_glenie2_piece_11a = extrude(amount=18, mode=Mode.PRIVATE)
    zaokr_glenie2_piece_11a = split(zaokr_glenie2_piece_11a, bisect_by=Plane(origin=(-6.5, 0.452790229, 34.447209771), z_dir=(-1, 0, 0)), keep=Keep.TOP, mode=Mode.PRIVATE)
    with BuildSketch(Plane(origin=(-6.5, 0, 40.9), x_dir=(-1, 0, 0), z_dir=(0, 0, -1))) as zaokr_glenie2_piece_11b_section:
        with BuildLine():
            CenterArc((ZAOKR_GLENIE2_R, ZAOKR_GLENIE2_R), ZAOKR_GLENIE2_R, 180, 90)
            Line((0, ZAOKR_GLENIE2_R), (0, 0))
            Line((0, 0), (ZAOKR_GLENIE2_R, 0))
        make_face()
    zaokr_glenie2_piece_11b = extrude(amount=11, mode=Mode.PRIVATE)
    zaokr_glenie2_piece_11b = split(zaokr_glenie2_piece_11b, bisect_by=Plane(origin=(-6.952790229, 0.452790229, 34.9), z_dir=(0, 0, -1)), keep=Keep.TOP, mode=Mode.PRIVATE)
    zaokr_glenie2_piece_11 = zaokr_glenie2_piece_11a & zaokr_glenie2_piece_11b
    add(zaokr_glenie2_piece_11, mode=Mode.SUBTRACT)
    with BuildSketch(Plane(origin=(6.5, 0, 40.9), x_dir=(1, 0, 0), z_dir=(0, 0, -1))) as zaokr_glenie2_piece_12a_section:
        with BuildLine():
            CenterArc((ZAOKR_GLENIE2_R, -ZAOKR_GLENIE2_R), ZAOKR_GLENIE2_R, 90, 90)
            Line((0, -ZAOKR_GLENIE2_R), (0, 0))
            Line((0, 0), (ZAOKR_GLENIE2_R, 0))
        make_face()
    zaokr_glenie2_piece_12a = extrude(amount=11, mode=Mode.PRIVATE)
    zaokr_glenie2_piece_12a = split(zaokr_glenie2_piece_12a, bisect_by=Plane(origin=(6.952790229, 0.452790229, 34.9), z_dir=(0, 0, -1)), keep=Keep.TOP, mode=Mode.PRIVATE)
    with BuildSketch(Plane(origin=(-6.5, 0, 34.9), x_dir=(0, 0, -1), z_dir=(1, 0, 0))) as zaokr_glenie2_piece_12b_section:
        with BuildLine():
            CenterArc((ZAOKR_GLENIE2_R, ZAOKR_GLENIE2_R), ZAOKR_GLENIE2_R, 180, 90)
            Line((0, ZAOKR_GLENIE2_R), (0, 0))
            Line((0, 0), (ZAOKR_GLENIE2_R, 0))
        make_face()
    zaokr_glenie2_piece_12b = extrude(amount=18, mode=Mode.PRIVATE)
    zaokr_glenie2_piece_12b = split(zaokr_glenie2_piece_12b, bisect_by=Plane(origin=(6.5, 0.452790229, 34.447209771), z_dir=(1, 0, 0)), keep=Keep.TOP, mode=Mode.PRIVATE)
    zaokr_glenie2_piece_12 = zaokr_glenie2_piece_12a & zaokr_glenie2_piece_12b
    add(zaokr_glenie2_piece_12, mode=Mode.SUBTRACT)

    # Szkic18 → Dodanie-wyciągnięcie10 (add)
    with BuildSketch(Plane.XY.offset(-14.325)):
        Polygon((28.5, 22.95), (21.6, 22.95), (28.5, 16.05), align=None)
    extrude(amount=-DODANIE_WYCI_GNI_CIE10_DEPTH)

    # Wytnij-wyciągnięcie8: up to this plane
    wytnij_wyci_gni_cie8_end = Plane(origin=(21.6, 22.95, -26.325), z_dir=(-0.7071067811865515, -0.7071067811865436, 0))
    # Szkic19 → Wytnij-wyciągnięcie8 (cut, up to the surface)
    with BuildSketch(Plane(origin=(30.5, 0, 0), x_dir=(0, 0, -1), z_dir=(1, 0, 0)), mode=Mode.PRIVATE) as wytnij_wyci_gni_cie8_sk1:
        with Locations((20.325, 19.283035289)):
            Rectangle(SZKIC19_W, SZKIC19_H)
    wytnij_wyci_gni_cie8_tool1 = split(extrude(wytnij_wyci_gni_cie8_sk1.sketch, amount=-WYTNIJ_WYCI_GNI_CIE8_REACH, mode=Mode.PRIVATE), bisect_by=wytnij_wyci_gni_cie8_end, keep=Keep.BOTH, mode=Mode.PRIVATE)
    add(wytnij_wyci_gni_cie8_tool1.solids().sort_by_distance((30.5, 19.283035, -20.325))[0], mode=Mode.SUBTRACT)

    # Szkic20 → Dodanie-wyciągnięcie11 (add)
    with BuildSketch(Plane.XY.offset(-25.325)):
        Polygon((28.641036203, 17.323177359), (24.014213562, 21.95), (22.6, 21.95), (27.933929422, 16.616070578), (29.348142984, 16.616070578), align=None)
    extrude(amount=DODANIE_WYCI_GNI_CIE11_DEPTH)

    # Szkic22 → Wytnij-wyciągnięcie10 (cut)
    with BuildSketch(Plane(origin=(0, 0, -44.9), x_dir=(-1, 0, 0), z_dir=(0, 0, -1))):
        with BuildLine():
            Line((9.5, 18.154357385), (9.5, 22.95))
            Line((9.5, 22.95), (6.5, 22.95))
            Line((6.5, 22.95), (6.5, 18.154357385))
            ThreePointArc((6.5, 18.154357385), (8, 19.654357385), (9.5, 18.154357385))
        make_face()
        with Locations((28.25, 20.552178693)):
            Rectangle(SZKIC22_W, SZKIC22_H)
        with BuildLine():
            ThreePointArc((-12, 18.154357385), (-10.25, 16.404357385), (-8.5, 18.154357385))
            ThreePointArc((-8.5, 18.154357385), (-10.25, 19.904357385), (-12, 18.154357385))
        make_face()
        with BuildLine():
            ThreePointArc((-12, 18.154357385), (-10.25, 19.904357385), (-8.5, 18.154357385))
            Line((-8.5, 18.154357385), (-8.5, 22.95))
            Line((-8.5, 22.95), (-12, 22.95))
            Line((-12, 22.95), (-12, 18.154357385))
        make_face()
        with BuildLine():
            ThreePointArc((6.5, 18.154357385), (8, 16.654357385), (9.5, 18.154357385))
            Line((9.5, 18.154357385), (6.5, 18.154357385))
        make_face()
        with BuildLine():
            Line((6.5, 18.154357385), (9.5, 18.154357385))
            ThreePointArc((9.5, 18.154357385), (8, 19.654357385), (6.5, 18.154357385))
        make_face()
    extrude(amount=-WYTNIJ_WYCI_GNI_CIE10_DEPTH, mode=Mode.SUBTRACT)

    # Szkic23 → Wytnij-wyciągnięcie11 (cut)
    with BuildSketch(Plane.ZY.offset(30.5)):
        with Locations((1, 20.552178693)):
            Rectangle(SZKIC23_W, SZKIC23_H)
    extrude(amount=-WYTNIJ_WYCI_GNI_CIE11_DEPTH, mode=Mode.SUBTRACT)

    # Szkic28 → Wytnij-wyciągnięcie17 (cut)
    with BuildSketch(Plane.XY.offset(44.9)):
        with Locations((-27.5, 20.552178693)):
            Rectangle(SZKIC28_W, SZKIC28_H)
        Polygon((-26.5, 18.154357385), (-4.153148332, 18.154357385), (0, 20.552178692), (0, 22.95), (-26.5, 22.95), align=None)
        Polygon((0, 22.95), (0, 20.552178692), (4.153148332, 22.95), align=None)
    extrude(amount=-WYTNIJ_WYCI_GNI_CIE17_DEPTH, mode=Mode.SUBTRACT)

    # Szkic29 → Dodanie-wyciągnięcie12 (add)
    with BuildSketch(Plane(origin=(0, 0, 42.9), x_dir=(-1, 0, 0), z_dir=(0, 0, -1))):
        Polygon((-28.5, 22.95), (-28.5, 16.05), (-21.6, 22.95), align=None)
    extrude(amount=DODANIE_WYCI_GNI_CIE12_DEPTH)

    # Wytnij-wyciągnięcie18: up to this plane
    wytnij_wyci_gni_cie18_end = Plane(origin=(28.5, 16.05, 26.01692642), z_dir=(0.7071067811865509, 0.7071067811865441, 0))
    # Szkic30 → Wytnij-wyciągnięcie18 (cut, up to the surface)
    with BuildSketch(Plane(origin=(30.5, 0, 0), x_dir=(0, 0, -1), z_dir=(1, 0, 0)), mode=Mode.PRIVATE) as wytnij_wyci_gni_cie18_sk1:
        with Locations((-38.3375, 19.283035289)):
            Rectangle(SZKIC30_W, SZKIC30_H)
    wytnij_wyci_gni_cie18_tool1 = split(extrude(wytnij_wyci_gni_cie18_sk1.sketch, amount=-WYTNIJ_WYCI_GNI_CIE18_REACH, mode=Mode.PRIVATE), bisect_by=wytnij_wyci_gni_cie18_end, keep=Keep.BOTH, mode=Mode.PRIVATE)
    add(wytnij_wyci_gni_cie18_tool1.solids().sort_by_distance((30.5, 19.283035, 38.3375))[0], mode=Mode.SUBTRACT)

    # Szkic31 → Dodanie-wyciągnięcie13 (add)
    with BuildSketch(Plane(origin=(0, 0, 39.9), x_dir=(-1, 0, 0), z_dir=(0, 0, -1))):
        Polygon((-27.933929422, 16.616070578), (-22.6, 21.95), (-24.014213562, 21.95), (-29.348142984, 16.616070578), align=None)
    extrude(amount=DODANIE_WYCI_GNI_CIE13_DEPTH)

    # Szkic32 → Wytnij-wyciągnięcie19 (cut)
    with BuildSketch(Plane(origin=(30.5, 0, 0), x_dir=(0, 0, -1), z_dir=(1, 0, 0))):
        Polygon((31.443665151, 22.95), (39.749961815, 18.154357385), (44.868626967, 18.154357385), (44.868626967, 22.95), align=None)
    extrude(amount=-WYTNIJ_WYCI_GNI_CIE19_DEPTH, mode=Mode.SUBTRACT)


solid = part.part
